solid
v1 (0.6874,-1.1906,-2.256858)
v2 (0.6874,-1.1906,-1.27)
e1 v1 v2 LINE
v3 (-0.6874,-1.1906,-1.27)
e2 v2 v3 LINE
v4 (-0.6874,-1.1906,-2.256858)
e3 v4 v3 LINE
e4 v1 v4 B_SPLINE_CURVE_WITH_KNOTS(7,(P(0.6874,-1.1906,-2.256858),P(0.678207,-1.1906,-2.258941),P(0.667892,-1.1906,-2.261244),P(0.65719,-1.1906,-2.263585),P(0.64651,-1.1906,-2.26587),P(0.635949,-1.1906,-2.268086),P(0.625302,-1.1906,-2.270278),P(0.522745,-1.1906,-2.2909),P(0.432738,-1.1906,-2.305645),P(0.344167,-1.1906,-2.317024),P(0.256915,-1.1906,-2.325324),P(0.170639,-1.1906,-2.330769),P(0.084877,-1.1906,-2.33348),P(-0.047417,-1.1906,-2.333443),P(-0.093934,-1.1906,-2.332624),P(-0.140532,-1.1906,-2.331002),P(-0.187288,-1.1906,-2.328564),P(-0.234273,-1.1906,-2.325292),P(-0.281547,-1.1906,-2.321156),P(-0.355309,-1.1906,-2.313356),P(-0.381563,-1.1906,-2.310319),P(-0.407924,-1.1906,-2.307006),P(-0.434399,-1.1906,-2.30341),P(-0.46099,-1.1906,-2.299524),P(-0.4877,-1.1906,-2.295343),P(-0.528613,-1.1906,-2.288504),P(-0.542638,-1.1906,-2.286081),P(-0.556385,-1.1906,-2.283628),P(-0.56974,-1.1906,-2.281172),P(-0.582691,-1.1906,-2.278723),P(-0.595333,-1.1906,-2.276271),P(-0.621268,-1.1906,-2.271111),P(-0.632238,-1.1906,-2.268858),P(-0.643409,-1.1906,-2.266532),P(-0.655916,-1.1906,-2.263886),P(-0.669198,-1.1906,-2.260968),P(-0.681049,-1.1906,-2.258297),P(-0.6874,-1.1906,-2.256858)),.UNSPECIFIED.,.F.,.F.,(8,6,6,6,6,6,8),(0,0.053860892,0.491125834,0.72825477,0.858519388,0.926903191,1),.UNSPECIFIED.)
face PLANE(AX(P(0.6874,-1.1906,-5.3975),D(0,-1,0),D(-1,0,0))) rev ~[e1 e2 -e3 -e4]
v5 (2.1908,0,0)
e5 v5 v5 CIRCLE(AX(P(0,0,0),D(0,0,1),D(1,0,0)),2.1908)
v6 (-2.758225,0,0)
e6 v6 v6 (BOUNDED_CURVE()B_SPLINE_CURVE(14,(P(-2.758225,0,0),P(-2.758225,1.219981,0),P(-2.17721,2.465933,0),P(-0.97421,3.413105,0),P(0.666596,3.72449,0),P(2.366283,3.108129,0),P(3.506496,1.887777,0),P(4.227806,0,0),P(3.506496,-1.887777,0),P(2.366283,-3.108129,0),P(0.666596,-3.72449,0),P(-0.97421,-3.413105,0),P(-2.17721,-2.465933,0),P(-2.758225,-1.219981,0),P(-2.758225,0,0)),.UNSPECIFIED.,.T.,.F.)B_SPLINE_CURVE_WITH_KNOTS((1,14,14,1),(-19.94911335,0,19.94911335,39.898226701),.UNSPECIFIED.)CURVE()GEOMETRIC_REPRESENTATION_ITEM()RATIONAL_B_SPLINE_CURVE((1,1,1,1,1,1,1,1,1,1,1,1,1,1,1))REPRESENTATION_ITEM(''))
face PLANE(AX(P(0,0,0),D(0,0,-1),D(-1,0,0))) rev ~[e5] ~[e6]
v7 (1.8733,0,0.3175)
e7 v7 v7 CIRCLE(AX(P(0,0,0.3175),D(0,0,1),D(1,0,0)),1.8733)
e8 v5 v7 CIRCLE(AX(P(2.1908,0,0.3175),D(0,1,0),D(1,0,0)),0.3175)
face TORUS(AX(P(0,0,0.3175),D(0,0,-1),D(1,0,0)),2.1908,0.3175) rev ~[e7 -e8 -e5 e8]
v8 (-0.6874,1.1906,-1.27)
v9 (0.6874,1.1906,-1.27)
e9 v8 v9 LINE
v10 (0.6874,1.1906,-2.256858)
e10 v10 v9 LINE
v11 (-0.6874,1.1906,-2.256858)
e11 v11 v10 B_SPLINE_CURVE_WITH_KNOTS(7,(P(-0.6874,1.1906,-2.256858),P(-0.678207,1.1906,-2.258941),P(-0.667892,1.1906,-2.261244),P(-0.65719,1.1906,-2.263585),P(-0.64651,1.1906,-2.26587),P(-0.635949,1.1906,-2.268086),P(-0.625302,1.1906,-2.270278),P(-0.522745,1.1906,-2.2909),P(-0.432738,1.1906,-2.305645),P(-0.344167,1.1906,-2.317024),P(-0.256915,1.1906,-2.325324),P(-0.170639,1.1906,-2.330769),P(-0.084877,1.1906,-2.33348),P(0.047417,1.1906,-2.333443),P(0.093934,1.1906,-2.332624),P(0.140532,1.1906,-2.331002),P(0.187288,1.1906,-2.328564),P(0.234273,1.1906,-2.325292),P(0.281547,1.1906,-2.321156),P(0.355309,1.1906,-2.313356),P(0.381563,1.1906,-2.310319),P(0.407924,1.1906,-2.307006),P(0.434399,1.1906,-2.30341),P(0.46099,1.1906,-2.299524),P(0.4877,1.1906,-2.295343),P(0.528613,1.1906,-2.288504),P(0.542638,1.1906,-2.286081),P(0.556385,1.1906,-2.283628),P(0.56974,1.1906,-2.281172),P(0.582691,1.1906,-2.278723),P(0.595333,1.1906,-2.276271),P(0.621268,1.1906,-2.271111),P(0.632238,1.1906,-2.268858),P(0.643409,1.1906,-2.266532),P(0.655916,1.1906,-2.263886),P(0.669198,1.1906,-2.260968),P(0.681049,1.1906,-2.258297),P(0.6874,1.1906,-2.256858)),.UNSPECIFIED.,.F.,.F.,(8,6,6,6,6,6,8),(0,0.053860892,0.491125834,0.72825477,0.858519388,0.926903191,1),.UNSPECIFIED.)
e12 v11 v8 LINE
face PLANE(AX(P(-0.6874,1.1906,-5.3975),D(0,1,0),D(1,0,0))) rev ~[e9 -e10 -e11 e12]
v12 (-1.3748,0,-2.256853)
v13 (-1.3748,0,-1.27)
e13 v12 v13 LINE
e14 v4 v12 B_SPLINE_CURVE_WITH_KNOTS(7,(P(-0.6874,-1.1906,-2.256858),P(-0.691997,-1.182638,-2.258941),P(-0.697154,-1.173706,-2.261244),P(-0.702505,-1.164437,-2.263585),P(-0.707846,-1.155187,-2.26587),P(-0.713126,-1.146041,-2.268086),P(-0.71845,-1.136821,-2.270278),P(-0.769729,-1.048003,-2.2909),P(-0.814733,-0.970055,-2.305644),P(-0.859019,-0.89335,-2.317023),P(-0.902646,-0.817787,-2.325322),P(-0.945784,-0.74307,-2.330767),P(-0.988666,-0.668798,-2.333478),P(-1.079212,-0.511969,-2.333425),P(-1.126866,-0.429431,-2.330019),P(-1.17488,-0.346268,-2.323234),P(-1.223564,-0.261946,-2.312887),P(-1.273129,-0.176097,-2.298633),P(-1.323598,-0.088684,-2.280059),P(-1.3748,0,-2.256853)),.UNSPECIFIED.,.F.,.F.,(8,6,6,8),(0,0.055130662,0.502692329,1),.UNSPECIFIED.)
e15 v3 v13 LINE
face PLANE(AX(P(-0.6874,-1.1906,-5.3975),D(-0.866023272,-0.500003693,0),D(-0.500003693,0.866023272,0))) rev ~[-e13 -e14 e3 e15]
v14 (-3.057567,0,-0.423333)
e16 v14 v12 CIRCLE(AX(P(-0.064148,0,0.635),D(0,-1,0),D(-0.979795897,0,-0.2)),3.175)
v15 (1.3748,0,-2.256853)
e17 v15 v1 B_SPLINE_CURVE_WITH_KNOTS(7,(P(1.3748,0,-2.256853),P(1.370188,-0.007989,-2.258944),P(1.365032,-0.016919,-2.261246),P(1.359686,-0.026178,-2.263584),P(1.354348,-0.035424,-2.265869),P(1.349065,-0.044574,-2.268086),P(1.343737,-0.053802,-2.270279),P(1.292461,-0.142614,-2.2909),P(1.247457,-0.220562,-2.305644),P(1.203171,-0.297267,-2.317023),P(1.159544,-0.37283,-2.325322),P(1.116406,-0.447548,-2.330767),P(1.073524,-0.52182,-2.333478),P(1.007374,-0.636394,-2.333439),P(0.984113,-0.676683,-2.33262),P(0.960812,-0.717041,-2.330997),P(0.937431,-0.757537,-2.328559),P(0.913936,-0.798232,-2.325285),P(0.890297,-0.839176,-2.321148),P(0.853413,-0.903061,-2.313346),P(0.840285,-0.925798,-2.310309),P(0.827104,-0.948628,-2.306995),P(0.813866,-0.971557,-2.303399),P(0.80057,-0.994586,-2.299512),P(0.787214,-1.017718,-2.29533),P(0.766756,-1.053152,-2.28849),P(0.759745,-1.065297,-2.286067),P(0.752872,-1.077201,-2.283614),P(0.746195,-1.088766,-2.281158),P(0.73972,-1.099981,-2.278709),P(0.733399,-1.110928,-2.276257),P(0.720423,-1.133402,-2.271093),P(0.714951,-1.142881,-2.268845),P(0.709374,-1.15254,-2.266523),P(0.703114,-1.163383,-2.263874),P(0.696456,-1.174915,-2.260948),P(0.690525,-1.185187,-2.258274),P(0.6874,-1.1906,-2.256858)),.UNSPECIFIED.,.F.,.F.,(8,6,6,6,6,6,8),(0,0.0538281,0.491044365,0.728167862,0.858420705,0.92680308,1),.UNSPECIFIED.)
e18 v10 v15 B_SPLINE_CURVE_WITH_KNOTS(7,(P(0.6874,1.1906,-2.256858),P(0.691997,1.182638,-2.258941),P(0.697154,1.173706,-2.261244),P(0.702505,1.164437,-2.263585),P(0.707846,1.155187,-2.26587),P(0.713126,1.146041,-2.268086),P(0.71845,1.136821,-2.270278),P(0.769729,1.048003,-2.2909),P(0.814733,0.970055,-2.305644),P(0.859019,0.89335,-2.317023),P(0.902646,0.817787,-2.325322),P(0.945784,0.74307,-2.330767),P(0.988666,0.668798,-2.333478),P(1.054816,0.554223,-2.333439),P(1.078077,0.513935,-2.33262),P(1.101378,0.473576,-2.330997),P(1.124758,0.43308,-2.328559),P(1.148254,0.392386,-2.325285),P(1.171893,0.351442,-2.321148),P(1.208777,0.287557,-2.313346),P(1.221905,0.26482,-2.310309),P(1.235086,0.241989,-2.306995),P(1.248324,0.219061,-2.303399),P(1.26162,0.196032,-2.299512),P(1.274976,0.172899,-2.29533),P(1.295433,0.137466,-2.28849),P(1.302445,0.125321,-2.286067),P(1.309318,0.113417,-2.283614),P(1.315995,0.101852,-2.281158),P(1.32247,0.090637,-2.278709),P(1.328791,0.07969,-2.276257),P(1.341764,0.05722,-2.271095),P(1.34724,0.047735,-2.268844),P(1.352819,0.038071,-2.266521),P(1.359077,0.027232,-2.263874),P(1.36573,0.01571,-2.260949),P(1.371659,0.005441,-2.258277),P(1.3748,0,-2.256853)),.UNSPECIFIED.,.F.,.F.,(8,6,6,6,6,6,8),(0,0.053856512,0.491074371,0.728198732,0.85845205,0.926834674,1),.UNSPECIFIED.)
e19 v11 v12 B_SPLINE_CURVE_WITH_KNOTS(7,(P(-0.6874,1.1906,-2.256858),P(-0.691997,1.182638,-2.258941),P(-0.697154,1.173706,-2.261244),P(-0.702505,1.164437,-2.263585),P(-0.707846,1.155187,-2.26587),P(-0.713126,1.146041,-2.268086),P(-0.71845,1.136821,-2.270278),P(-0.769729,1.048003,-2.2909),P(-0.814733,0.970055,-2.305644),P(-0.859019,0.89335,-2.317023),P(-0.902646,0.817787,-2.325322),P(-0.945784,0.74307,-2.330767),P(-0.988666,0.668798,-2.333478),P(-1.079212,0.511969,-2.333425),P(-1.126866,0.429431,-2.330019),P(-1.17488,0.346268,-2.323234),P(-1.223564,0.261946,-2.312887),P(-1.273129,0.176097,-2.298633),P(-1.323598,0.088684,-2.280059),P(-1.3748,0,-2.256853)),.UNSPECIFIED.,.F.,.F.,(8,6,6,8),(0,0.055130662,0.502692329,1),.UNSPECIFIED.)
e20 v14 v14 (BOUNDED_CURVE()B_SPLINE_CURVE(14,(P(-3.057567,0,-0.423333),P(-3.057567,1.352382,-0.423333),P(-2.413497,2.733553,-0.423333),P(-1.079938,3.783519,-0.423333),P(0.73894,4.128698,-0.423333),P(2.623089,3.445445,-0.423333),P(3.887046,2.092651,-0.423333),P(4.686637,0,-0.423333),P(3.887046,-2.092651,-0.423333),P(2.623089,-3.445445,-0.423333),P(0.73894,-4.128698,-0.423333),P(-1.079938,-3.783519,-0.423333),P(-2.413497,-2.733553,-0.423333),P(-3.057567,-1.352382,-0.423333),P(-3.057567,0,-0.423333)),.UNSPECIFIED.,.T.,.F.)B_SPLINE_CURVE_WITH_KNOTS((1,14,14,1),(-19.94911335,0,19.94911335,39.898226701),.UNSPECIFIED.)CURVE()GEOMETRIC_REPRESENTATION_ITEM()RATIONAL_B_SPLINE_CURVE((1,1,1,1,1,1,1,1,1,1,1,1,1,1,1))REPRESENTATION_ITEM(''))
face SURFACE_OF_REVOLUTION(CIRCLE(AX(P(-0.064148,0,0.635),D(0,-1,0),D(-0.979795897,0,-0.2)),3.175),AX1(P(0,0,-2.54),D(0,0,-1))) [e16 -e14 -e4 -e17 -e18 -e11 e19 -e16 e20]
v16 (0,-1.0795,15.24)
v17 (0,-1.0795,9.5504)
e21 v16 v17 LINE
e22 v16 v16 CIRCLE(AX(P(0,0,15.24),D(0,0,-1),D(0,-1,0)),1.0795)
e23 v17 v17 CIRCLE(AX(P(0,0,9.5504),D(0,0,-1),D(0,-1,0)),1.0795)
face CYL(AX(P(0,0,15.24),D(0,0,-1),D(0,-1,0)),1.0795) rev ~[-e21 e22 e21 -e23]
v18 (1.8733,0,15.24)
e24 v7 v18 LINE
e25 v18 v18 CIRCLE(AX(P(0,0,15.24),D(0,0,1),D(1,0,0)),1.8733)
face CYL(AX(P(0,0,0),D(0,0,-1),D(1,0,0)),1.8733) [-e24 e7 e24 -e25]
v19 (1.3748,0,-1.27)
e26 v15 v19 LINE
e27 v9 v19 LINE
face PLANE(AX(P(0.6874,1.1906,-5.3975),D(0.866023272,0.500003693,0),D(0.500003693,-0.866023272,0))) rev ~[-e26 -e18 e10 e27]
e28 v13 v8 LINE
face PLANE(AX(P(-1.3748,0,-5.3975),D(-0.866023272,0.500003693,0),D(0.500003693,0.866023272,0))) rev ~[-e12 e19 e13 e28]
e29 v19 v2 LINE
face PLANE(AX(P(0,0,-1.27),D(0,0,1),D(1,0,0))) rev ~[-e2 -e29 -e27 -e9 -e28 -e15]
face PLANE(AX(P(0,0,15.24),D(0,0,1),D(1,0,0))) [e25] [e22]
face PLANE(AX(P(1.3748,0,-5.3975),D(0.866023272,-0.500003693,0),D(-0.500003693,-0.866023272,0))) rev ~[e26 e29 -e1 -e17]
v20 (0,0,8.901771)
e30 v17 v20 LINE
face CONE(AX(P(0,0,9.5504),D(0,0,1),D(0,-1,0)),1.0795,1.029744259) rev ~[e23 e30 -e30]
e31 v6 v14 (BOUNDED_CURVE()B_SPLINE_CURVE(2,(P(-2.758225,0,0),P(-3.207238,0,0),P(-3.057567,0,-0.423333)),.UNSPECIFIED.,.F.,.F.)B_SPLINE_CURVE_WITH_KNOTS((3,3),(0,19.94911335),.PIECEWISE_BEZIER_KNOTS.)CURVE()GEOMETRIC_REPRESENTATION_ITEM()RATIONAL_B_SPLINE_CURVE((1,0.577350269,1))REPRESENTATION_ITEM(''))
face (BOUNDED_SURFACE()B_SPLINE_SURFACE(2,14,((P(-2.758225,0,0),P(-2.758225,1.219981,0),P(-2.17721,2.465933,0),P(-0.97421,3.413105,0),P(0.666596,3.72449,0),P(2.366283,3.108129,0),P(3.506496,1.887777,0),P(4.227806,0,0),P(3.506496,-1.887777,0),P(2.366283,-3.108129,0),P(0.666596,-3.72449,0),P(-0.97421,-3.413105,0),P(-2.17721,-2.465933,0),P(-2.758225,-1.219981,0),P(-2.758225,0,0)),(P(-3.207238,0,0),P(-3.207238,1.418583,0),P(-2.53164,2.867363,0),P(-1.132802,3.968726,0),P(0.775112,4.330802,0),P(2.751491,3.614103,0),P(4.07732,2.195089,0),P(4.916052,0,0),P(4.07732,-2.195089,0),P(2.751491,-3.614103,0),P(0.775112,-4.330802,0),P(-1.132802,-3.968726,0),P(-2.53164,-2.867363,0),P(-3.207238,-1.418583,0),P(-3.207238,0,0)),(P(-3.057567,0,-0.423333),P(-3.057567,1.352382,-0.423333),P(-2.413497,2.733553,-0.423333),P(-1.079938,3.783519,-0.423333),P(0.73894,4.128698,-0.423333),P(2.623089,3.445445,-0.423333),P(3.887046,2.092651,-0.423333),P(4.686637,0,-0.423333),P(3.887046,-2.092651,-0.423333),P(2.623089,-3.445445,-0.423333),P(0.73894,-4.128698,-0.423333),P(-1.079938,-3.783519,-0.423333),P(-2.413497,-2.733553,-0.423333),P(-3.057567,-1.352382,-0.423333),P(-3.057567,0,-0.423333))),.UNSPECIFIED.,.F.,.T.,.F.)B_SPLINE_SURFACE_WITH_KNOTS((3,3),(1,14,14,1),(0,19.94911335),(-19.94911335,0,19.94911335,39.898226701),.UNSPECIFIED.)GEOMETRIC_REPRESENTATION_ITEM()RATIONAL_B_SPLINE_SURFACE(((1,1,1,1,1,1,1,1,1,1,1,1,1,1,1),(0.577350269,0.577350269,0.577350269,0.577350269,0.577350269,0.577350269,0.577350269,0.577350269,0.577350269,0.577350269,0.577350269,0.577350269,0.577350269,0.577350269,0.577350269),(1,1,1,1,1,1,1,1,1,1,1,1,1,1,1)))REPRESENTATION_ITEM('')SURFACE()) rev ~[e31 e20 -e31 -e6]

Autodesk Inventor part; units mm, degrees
ref_plane "YZ Plane" through (0, 0, 0) normal (1, 0, 0) x (0, 1, 0)
ref_plane "XZ Plane" through (0, 0, 0) normal (0, 1, 0) x (-1, 0, 0)
sketch "Sketch1" plane through (0, 0, 0) normal (0, 0, 1) x (1, 0, 0)
  circle A0 centre (0, 0) radius 1.8733
  dimension "d0" = 3.7465
extrude "Extrusion1" add sketch "Sketch1" along normal blind 15.24
sketch "Sketch2" plane through (0, 0, 0) normal (0, 0, -1) x (-1, 0, 0)
  circle A0 centre (0, 0) radius 1.8732 projected
  circle A1 centre (0, 0) radius 3.175
  dimension "d3" = 6.35
extrude "Extrusion2" add sketch "Sketch2" along normal blind 2.54 contours A0 | A1
fillet "Fillet1" radius 3.175 1 edges at (3.175, 0, -2.54)
fillet "Fillet2" radius 0.3175 1 edges at (3.175, 0, 0)
fillet "Fillet3" radius 0.3175 1 edges at (-1.8733, 0, 0)
ref_plane "Work Plane1" through (0, 0, -5.3975) normal (0, 0, 1) x (1, 0, 0)
sketch "Sketch4" plane through (0, 0, -5.3975) normal (0, 0, 1) x (1, 0, 0)
  line L0 (1.3748, 0) -> (0.6874, -1.1906)
  line L1 (0.6874, -1.1906) -> (-0.6874, -1.1906)
  line L2 (-0.6874, -1.1906) -> (-1.3748, 0)
  line L3 (-1.3748, 0) -> (-0.6874, 1.1906)
  line L4 (-0.6874, 1.1906) -> (0.6874, 1.1906)
  line L5 (0.6874, 1.1906) -> (1.3748, 0)
  point P0 (0, 0)
  point P1 (0, 0)
  dimension "d19" = 2.3813
extrude "Extrusion3" cut sketch "Sketch4" along normal blind 4.1275
sketch "Sketch5" plane through (0, 0, 15.24) normal (0, 0, 1) x (1, 0, 0)
  point P0 (0, 0)
hole "Hole1" at (0, 0, 15.24) direction (0, 0, -1) diameter 2.159 depth 5.6896 tip angle 118
properties part number "Axel - Female" material "PBT Plastic"
